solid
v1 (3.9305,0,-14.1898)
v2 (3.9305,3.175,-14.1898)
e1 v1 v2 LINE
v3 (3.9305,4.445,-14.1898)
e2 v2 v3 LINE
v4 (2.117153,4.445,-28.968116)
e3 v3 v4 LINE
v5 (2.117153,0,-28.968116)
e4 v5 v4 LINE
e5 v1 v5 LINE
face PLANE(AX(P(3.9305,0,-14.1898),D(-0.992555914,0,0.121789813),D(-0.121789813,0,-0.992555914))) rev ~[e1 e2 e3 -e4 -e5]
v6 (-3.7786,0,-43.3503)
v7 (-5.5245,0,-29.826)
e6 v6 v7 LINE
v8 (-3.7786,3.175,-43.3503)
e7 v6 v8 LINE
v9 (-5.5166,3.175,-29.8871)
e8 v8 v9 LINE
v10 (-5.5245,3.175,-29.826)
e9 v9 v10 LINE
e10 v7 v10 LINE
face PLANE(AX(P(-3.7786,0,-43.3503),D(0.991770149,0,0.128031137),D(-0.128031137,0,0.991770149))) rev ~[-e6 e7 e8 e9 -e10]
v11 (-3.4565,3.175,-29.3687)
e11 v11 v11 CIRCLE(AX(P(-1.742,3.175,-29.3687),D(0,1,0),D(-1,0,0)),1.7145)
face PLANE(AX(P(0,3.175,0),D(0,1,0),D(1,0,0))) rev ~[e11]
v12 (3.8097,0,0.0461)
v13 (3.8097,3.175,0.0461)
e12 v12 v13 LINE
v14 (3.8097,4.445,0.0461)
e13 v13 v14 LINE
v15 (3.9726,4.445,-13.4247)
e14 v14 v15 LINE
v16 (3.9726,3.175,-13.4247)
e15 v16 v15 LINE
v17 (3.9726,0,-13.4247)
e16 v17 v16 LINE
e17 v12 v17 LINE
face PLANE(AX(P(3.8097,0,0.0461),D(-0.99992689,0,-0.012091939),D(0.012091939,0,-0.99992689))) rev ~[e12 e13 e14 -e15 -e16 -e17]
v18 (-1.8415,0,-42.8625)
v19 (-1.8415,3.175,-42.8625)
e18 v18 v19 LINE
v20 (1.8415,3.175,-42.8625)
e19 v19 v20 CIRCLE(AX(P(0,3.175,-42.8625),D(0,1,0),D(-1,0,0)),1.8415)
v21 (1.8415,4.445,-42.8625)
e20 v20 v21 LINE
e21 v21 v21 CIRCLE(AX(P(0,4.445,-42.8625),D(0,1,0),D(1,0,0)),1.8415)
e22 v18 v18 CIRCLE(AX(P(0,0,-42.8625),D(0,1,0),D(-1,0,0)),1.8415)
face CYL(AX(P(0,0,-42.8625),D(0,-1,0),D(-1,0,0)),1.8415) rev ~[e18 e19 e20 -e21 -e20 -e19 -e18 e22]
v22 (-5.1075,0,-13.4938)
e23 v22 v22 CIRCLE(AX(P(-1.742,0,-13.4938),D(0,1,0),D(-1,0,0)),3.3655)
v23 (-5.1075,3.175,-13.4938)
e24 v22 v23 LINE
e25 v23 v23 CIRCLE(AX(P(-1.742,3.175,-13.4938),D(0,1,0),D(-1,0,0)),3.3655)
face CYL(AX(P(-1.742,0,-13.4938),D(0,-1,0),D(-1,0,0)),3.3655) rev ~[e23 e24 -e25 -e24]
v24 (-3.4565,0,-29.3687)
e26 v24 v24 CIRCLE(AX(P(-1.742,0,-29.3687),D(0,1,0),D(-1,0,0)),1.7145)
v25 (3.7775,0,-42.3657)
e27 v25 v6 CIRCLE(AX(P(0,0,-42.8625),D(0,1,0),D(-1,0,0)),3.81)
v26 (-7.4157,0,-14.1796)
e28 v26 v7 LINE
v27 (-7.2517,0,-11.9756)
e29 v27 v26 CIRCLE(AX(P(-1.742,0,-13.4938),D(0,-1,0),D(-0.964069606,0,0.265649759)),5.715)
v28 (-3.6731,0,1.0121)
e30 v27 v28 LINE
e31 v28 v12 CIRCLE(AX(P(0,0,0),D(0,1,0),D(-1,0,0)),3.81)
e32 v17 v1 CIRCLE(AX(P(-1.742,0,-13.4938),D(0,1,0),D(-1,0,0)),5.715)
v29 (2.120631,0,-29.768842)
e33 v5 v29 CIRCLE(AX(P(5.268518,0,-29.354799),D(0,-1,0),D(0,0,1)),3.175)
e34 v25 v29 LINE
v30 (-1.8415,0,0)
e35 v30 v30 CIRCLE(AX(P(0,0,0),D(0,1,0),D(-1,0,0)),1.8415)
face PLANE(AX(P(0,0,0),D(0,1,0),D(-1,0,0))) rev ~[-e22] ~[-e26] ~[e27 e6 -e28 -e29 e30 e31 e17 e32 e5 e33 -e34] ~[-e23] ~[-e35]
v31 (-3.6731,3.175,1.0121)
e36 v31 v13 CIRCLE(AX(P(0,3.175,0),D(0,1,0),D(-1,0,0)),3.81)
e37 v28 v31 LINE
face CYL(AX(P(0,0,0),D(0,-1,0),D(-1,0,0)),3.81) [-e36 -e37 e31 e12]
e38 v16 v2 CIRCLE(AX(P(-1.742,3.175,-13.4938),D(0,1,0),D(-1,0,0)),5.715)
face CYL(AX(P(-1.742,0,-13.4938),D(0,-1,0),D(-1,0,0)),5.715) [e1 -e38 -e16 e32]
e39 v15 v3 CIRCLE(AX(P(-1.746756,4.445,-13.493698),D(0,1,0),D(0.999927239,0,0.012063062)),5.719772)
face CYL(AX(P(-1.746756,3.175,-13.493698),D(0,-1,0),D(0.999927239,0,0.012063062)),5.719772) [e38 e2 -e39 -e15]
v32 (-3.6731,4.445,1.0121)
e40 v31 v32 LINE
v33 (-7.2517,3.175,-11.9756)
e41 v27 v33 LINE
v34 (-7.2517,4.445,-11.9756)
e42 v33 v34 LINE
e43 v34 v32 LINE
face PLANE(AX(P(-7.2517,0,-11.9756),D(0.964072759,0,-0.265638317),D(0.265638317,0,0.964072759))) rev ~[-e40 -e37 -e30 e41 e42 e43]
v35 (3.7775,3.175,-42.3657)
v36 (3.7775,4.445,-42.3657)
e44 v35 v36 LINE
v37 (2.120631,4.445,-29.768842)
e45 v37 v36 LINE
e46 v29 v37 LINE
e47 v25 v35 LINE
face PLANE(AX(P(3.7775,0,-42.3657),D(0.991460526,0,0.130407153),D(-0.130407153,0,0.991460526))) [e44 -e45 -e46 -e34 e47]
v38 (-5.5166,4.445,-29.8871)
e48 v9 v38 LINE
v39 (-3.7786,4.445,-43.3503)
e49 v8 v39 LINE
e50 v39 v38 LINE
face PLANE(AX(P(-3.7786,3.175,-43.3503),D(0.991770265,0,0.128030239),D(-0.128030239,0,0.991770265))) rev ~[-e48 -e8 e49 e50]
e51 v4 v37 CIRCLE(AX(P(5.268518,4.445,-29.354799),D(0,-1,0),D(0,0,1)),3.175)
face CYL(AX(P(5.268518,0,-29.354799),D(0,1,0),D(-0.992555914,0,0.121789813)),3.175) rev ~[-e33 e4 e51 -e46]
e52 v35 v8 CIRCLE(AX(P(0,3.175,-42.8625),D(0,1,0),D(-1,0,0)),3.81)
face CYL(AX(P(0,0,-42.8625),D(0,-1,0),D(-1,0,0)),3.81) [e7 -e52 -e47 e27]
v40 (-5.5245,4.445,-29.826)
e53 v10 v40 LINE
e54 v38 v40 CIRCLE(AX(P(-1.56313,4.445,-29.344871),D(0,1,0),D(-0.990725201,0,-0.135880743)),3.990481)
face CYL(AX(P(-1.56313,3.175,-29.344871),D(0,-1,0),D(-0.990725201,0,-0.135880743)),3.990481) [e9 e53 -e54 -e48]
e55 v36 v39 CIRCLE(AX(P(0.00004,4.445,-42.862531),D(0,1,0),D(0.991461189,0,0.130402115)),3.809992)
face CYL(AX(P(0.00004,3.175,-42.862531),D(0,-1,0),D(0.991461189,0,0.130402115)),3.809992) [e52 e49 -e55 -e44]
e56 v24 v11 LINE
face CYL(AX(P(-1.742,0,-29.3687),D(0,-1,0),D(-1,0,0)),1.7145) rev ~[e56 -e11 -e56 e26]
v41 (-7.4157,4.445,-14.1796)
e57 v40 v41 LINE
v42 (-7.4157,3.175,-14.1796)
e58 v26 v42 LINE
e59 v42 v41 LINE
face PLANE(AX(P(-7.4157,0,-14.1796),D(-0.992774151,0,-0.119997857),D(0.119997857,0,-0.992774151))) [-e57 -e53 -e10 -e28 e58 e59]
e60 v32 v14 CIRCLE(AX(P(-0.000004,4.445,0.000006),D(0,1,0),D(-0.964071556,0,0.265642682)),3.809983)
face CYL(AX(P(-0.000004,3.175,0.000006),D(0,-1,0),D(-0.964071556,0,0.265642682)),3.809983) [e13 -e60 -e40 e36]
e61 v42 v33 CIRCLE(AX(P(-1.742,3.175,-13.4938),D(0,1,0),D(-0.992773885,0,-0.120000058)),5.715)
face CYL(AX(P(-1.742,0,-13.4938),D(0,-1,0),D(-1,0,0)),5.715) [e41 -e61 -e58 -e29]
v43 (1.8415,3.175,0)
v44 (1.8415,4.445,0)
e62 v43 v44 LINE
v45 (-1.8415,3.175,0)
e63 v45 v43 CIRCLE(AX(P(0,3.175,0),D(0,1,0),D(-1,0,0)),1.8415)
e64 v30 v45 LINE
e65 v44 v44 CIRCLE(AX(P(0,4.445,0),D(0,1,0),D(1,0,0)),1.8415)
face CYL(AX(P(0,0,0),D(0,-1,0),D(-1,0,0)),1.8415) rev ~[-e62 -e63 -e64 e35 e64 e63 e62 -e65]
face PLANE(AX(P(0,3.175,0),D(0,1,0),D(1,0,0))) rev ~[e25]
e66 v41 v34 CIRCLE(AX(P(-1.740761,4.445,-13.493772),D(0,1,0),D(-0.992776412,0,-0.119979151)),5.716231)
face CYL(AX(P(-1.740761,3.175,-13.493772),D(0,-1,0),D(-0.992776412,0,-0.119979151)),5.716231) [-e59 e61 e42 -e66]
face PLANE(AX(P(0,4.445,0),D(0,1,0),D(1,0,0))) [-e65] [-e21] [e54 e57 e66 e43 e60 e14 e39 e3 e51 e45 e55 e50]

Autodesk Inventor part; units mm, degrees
ref_plane "YZ Plane" through (0, 0, 0) normal (1, 0, 0) x (0, 1, 0)
ref_plane "XZ Plane" through (0, 0, 0) normal (0, 1, 0) x (-1, 0, 0)
ref_plane "XY Plane" through (0, 0, 0) normal (0, 0, 1) x (1, 0, 0)
sketch "Sketch1" plane through (0, 0, 0) normal (0, 1, 0) x (-1, 0, 0)
  circle A0 centre (0, 0) radius 1.8415
  circle A1 centre (0, -42.8625) radius 1.8415
  line L0 (0, 0) -> (0, -42.8625) construction
  circle A2 centre (1.742, -13.4938) radius 3.3655
  circle A3 centre (1.742, -29.3687) radius 1.7145
  line L1 (1.742, -29.3687) -> (1.742, -13.4938) construction
  circle A4 centre (0, 0) radius 3.81
  circle A5 centre (0, -42.8625) radius 3.81
  circle A6 centre (1.742, -13.4938) radius 5.715
  circle A7 centre (1.742, -29.3687) radius 3.81
  line L2 (7.2517, -11.9756) -> (3.6731, 1.0121)
  line L3 (-3.8097, 0.0461) -> (-3.9726, -13.4247)
  line L4 (-3.9305, -14.1898) -> (-2.068, -29.3687)
  line L5 (7.4157, -14.1796) -> (5.5245, -29.826)
  line L6 (3.7786, -43.3503) -> (5.5245, -29.826)
  line L7 (-3.7775, -42.3657) -> (-2.068, -29.3687)
  point P0 (-37.12, -21.4312)
  point P1 (0, -21.4312)
  point P2 (1.742, -21.4312)
  dimension "d0" = 3.683
  dimension "d1" = 42.8625
  dimension "d2" = 42.8625
  dimension "d3" = 6.731
  dimension "d4" = 3.429
  dimension "d5" = 15.875
  dimension "d6" = 38.862
  dimension "d7" = 7.62
  dimension "d8" = 11.43
  dimension "d9" = 7.62
extrude "Extrusion1" add sketch "Sketch1" along normal blind 3.175
sketch "Sketch2" plane through (0, 3.175, 0) normal (0, 1, 0) x (1, 0, 0)
  circle A0 centre (-1.742, 13.4938) radius 3.3655 projected
  circle A1 centre (0, 0) radius 1.8415 projected
  circle A2 centre (-1.742, 29.3687) radius 1.7145 projected
  circle A3 centre (0, 42.8625) radius 1.8415 projected
  arc A4 (3.7775, 42.3657) -> (-3.7786, 43.3503) centre (0, 42.8625) ccw projected
  line L0 (-3.7786, 43.3503) -> (-5.5166, 29.8871) projected
  line L1 (-5.5245, 29.826) -> (-7.4157, 14.1796) projected
  arc A5 (-7.4157, 14.1796) -> (-7.2517, 11.9756) centre (-1.742, 13.4938) ccw projected
  line L2 (-7.2517, 11.9756) -> (-3.6731, -1.0121) projected
  arc A6 (-3.6731, -1.0121) -> (3.8097, -0.0461) centre (0, 0) ccw projected
  line L3 (3.8097, -0.0461) -> (3.9726, 13.4247) projected
  arc A7 (3.9726, 13.4247) -> (3.9305, 14.1898) centre (-1.742, 13.4938) ccw projected
  line L4 (3.9305, 14.1898) -> (2.068, 29.3687) projected
  line L5 (2.068, 29.3687) -> (3.7775, 42.3657) projected
  arc A8 (-5.5166, 29.8871) -> (-5.5245, 29.826) centre (-1.742, 29.3687) ccw projected
extrude "Extrusion2" add sketch "Sketch2" along normal blind 1.27 contours A0 | A2 | L5 L4 A7 L3 A6 L2 A5 L1 A8 L0 A4
fillet "Fillet1" radius 3.175 1 edges at (2.068, 2.2225, -29.3687)
properties part number "CarrageRodEndMount" material "ABS Plastic"
